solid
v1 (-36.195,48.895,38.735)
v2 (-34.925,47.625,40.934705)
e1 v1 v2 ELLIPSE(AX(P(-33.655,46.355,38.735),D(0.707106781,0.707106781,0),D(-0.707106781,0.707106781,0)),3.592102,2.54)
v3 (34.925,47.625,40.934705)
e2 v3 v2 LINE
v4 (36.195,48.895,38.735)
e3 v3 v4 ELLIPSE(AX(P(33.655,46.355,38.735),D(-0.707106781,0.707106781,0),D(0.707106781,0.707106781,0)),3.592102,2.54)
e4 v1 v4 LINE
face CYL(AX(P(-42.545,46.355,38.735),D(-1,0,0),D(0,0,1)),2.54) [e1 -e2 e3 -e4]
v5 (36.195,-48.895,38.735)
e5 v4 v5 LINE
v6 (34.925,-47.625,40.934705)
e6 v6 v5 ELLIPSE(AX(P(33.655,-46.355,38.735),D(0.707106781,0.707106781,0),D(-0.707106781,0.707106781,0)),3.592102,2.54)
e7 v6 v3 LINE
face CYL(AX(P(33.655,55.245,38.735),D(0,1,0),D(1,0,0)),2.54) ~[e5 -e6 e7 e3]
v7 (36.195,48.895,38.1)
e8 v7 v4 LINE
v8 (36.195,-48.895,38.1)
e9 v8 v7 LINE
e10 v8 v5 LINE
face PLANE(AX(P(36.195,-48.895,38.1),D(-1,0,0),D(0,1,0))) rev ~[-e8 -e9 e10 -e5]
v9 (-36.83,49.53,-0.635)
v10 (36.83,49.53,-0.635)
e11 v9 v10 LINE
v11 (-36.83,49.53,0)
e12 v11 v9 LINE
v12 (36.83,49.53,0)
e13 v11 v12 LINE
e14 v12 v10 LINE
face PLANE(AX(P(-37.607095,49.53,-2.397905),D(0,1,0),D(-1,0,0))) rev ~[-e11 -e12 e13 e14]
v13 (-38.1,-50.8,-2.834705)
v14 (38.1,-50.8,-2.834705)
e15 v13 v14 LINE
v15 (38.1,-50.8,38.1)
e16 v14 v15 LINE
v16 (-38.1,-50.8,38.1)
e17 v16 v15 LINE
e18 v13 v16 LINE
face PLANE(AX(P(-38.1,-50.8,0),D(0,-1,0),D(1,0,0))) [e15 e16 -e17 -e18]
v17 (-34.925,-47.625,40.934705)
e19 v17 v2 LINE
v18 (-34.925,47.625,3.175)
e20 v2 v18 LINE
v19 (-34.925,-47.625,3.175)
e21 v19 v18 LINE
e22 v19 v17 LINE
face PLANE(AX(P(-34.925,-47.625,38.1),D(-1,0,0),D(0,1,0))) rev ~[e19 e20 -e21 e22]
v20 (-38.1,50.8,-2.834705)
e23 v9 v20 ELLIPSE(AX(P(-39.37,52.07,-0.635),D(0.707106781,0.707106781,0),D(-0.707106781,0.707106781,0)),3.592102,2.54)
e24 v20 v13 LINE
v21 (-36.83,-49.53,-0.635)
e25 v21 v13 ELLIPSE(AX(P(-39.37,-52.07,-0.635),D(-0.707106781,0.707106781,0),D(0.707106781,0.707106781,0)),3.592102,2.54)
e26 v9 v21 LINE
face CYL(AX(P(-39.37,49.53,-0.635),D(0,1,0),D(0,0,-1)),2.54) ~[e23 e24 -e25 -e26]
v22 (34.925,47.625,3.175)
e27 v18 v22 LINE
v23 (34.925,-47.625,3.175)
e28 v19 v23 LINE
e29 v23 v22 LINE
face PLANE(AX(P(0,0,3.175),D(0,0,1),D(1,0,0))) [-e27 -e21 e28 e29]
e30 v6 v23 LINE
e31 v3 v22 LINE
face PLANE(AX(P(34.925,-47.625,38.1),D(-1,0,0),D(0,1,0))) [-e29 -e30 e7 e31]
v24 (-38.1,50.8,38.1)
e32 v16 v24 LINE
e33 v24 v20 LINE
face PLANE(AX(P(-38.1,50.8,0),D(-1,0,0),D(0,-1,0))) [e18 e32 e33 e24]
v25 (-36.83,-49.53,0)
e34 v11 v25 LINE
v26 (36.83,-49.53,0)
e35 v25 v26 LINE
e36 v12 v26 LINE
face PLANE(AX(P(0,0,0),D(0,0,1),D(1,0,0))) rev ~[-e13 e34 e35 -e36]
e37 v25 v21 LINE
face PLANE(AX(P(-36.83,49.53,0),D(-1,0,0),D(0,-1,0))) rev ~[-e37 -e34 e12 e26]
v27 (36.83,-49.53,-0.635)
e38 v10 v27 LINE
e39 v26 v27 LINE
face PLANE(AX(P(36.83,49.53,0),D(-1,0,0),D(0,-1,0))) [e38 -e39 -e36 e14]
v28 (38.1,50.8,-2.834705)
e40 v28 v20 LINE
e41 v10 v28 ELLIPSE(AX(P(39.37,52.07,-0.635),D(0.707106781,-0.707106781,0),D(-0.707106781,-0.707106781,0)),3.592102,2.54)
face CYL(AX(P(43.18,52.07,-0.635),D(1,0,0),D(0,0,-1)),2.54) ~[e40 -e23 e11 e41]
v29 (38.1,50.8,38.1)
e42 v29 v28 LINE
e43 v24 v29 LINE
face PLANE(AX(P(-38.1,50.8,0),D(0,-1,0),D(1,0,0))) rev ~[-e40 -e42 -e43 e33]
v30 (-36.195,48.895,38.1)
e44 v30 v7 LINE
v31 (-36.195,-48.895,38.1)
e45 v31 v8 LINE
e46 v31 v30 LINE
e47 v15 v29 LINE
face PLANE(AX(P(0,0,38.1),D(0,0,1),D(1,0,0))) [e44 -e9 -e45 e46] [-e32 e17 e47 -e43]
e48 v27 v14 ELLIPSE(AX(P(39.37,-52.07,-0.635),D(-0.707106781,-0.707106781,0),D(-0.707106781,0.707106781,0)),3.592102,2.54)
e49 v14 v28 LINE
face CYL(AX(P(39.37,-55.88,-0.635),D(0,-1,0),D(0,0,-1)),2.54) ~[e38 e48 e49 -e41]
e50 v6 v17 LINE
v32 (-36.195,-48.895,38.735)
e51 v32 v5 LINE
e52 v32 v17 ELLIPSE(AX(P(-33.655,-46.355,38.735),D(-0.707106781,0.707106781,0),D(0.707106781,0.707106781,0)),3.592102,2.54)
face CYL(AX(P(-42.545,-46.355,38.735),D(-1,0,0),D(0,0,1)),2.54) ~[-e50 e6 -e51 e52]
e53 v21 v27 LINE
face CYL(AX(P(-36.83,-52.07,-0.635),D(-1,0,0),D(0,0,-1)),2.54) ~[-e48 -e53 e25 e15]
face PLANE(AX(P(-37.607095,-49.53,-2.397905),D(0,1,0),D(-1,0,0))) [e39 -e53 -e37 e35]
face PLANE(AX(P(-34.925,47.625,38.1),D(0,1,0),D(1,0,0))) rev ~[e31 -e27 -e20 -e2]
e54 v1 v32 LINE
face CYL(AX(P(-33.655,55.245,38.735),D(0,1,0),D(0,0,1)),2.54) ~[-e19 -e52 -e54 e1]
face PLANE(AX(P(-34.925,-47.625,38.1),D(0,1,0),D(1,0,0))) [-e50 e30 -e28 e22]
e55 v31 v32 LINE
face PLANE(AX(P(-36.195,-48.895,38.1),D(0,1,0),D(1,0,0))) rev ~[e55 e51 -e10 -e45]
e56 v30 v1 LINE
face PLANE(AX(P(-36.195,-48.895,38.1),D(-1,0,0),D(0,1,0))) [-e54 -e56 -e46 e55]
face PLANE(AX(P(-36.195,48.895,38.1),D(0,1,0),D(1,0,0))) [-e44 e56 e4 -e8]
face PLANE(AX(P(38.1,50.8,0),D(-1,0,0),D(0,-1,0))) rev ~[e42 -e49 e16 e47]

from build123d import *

# Parameters (mm, degrees)
F0_W         = 76.2
F0_H         = 101.6
F1_DEPTH     = 38.1
F2_W         = 69.85
F2_H         = 95.25
F3_DEPTH     = 34.925
F4_W         = 72.39
F4_H         = 97.79
F4_W_2       = 69.85
F4_H_2       = 95.25
F5_DEPTH     = 3.175
F6_W         = 76.2
F6_H         = 101.6
F6_W_2       = 73.66
F6_H_2       = 99.06
F7_DEPTH     = 3.175
F8_T1_DEPTH  = 110.49
F8_T3_DEPTH  = 85.09
F8_T5_DEPTH  = 99.06
F8_T7_DEPTH  = 73.66
F8_T13_DEPTH = 105.41
F8_T19_DEPTH = 80.01
F8_T28_DEPTH = 105.41
F8_T34_DEPTH = 80.01
F8_T43_DEPTH = 80.01
F8_T49_DEPTH = 105.41
F8_T58_DEPTH = 105.41
F8_T64_DEPTH = 80.01


# Not quite as in the source:
# - a fillet or chamfer that OpenCascade refuses, or shapes differently, is made with other operations: its cross-section is extruded or revolved along the edge and cut away or added


with BuildPart() as f1:
    # F0 (on Top) → F1 (new body)
    with BuildSketch(Plane.XY):
        Rectangle(F0_W, F0_H)
    extrude(amount=F1_DEPTH)

    # F2 (on face) → F3 (cut)
    with BuildSketch(Plane.XY.offset(38.1)):
        Rectangle(F2_W, F2_H)
    extrude(amount=-F3_DEPTH, mode=Mode.SUBTRACT)

    # F4 (on face) → F5 (join)
    with BuildSketch(Plane.XY.offset(38.1)):
        Rectangle(F4_W, F4_H)
        Rectangle(F4_W_2, F4_H_2, mode=Mode.SUBTRACT)
    extrude(amount=F5_DEPTH)

    # F6 (on face) → F7 (join)
    with BuildSketch(Plane(origin=(0, 0, 0), x_dir=(1, 0, 0), z_dir=(0, 0, -1))):
        Rectangle(F6_W, F6_H)
        Rectangle(F6_W_2, F6_H_2, mode=Mode.SUBTRACT)
    extrude(amount=F7_DEPTH)

    # F8: fillet of radius 2.54 on 8 edges, made by hand

    # F8_s2 → F8_t1 (cut)
    with BuildSketch(Plane.XZ.offset(-55.245)):
        with BuildLine():
            ThreePointArc((-33.655, 41.275), (-35.4510512242, 40.5310512242), (-36.195, 38.735))
            Line((-36.195, 38.735), (-36.195, 41.275))
            Line((-36.195, 41.275), (-33.655, 41.275))
        make_face()
        with BuildLine():
            ThreePointArc((36.195, 38.735), (35.4510512242, 40.5310512242), (33.655, 41.275))
            Line((33.655, 41.275), (36.195, 41.275))
            Line((36.195, 41.275), (36.195, 38.735))
        make_face()
    extrude(amount=F8_T1_DEPTH, mode=Mode.SUBTRACT)

    # F8_s4 → F8_t3 (cut)
    with BuildSketch(Plane.YZ.offset(-42.545)):
        with BuildLine():
            ThreePointArc((-46.355, 41.275), (-48.1510512242, 40.5310512242), (-48.895, 38.735))
            Line((-48.895, 38.735), (-48.895, 41.275))
            Line((-48.895, 41.275), (-46.355, 41.275))
        make_face()
        with BuildLine():
            ThreePointArc((46.355, 41.275), (48.1510512242, 40.5310512242), (48.895, 38.735))
            Line((48.895, 38.735), (48.895, 41.275))
            Line((48.895, 41.275), (46.355, 41.275))
        make_face()
    extrude(amount=F8_T3_DEPTH, mode=Mode.SUBTRACT)

    # F8_s6 → F8_t5 (cut)
    with BuildSketch(Plane.XZ.offset(-49.53)):
        with BuildLine():
            ThreePointArc((-39.37, -3.175), (-37.5739487758, -2.4310512242), (-36.83, -0.635))
            Line((-36.83, -0.635), (-36.83, -3.175))
            Line((-36.83, -3.175), (-39.37, -3.175))
        make_face()
        with BuildLine():
            ThreePointArc((39.37, -3.175), (37.5739487758, -2.4310512242), (36.83, -0.635))
            Line((36.83, -0.635), (36.83, -3.175))
            Line((36.83, -3.175), (39.37, -3.175))
        make_face()
    extrude(amount=F8_T5_DEPTH, mode=Mode.SUBTRACT)

    # F8_s8 → F8_t7 (cut)
    with BuildSketch(Plane.YZ.offset(-36.83)):
        with BuildLine():
            ThreePointArc((-52.07, -3.175), (-50.2739487758, -2.4310512242), (-49.53, -0.635))
            Line((-49.53, -0.635), (-49.53, -3.175))
            Line((-49.53, -3.175), (-52.07, -3.175))
        make_face()
        with BuildLine():
            ThreePointArc((52.07, -3.175), (50.2739487758, -2.4310512242), (49.53, -0.635))
            Line((49.53, -0.635), (49.53, -3.175))
            Line((49.53, -3.175), (52.07, -3.175))
        make_face()
    extrude(amount=F8_T7_DEPTH, mode=Mode.SUBTRACT)


with BuildPart() as f8_tool11:
    # F8_s12 → F8_t13 (new body)
    with BuildSketch(Plane.XZ.offset(-55.88)):
        with BuildLine():
            ThreePointArc((-39.37, -3.175), (-37.5739487758, -2.4310512242), (-36.83, -0.635))
            Line((-36.83, -0.635), (-36.83, -3.175))
            Line((-36.83, -3.175), (-39.37, -3.175))
        make_face()
    extrude(amount=F8_T13_DEPTH)

    split(bisect_by=Plane.XZ.offset(-49.53), keep=Keep.BOTTOM)

    split(bisect_by=Plane.YZ.offset(-38.1), keep=Keep.TOP)

    split(bisect_by=Plane.XZ.offset(-50.8), keep=Keep.TOP)


with BuildPart() as f8_tool17:
    # F8_s18 → F8_t19 (new body)
    with BuildSketch(Plane.YZ.offset(36.83)):
        with BuildLine():
            ThreePointArc((52.07, -3.175), (50.2739487758, -2.4310512242), (49.53, -0.635))
            Line((49.53, -0.635), (49.53, -3.175))
            Line((49.53, -3.175), (52.07, -3.175))
        make_face()
    extrude(amount=-F8_T19_DEPTH)

    split(bisect_by=Plane.YZ.offset(-36.83), keep=Keep.BOTTOM)

    split(bisect_by=Plane.YZ.offset(-38.1), keep=Keep.TOP)

    split(bisect_by=Plane.XZ.offset(-50.8), keep=Keep.TOP)


with BuildPart() as f8_tool11_1:
    add(f8_tool11.part)

    # F8_t23: intersect F8_tool17
    add(f8_tool17.part, mode=Mode.INTERSECT)


with BuildPart() as f1_1:
    add(f1.part)

    # F8_t9: cut F8_tool11
    add(f8_tool11_1.part, mode=Mode.SUBTRACT)


with BuildPart() as f8_tool26:
    # F8_s27 → F8_t28 (new body)
    with BuildSketch(Plane.XZ.offset(-49.53)):
        with BuildLine():
            ThreePointArc((-39.37, -3.175), (-37.5739487758, -2.4310512242), (-36.83, -0.635))
            Line((-36.83, -0.635), (-36.83, -3.175))
            Line((-36.83, -3.175), (-39.37, -3.175))
        make_face()
    extrude(amount=F8_T28_DEPTH)

    split(bisect_by=Plane.XZ.offset(49.53), keep=Keep.TOP)

    split(bisect_by=Plane.YZ.offset(-38.1), keep=Keep.TOP)

    split(bisect_by=Plane.XZ.offset(50.8), keep=Keep.BOTTOM)


with BuildPart() as f8_tool32:
    # F8_s33 → F8_t34 (new body)
    with BuildSketch(Plane.YZ.offset(-43.18)):
        with BuildLine():
            ThreePointArc((-52.07, -3.175), (-50.2739487758, -2.4310512242), (-49.53, -0.635))
            Line((-49.53, -0.635), (-49.53, -3.175))
            Line((-49.53, -3.175), (-52.07, -3.175))
        make_face()
    extrude(amount=F8_T34_DEPTH)

    split(bisect_by=Plane.YZ.offset(-36.83), keep=Keep.BOTTOM)

    split(bisect_by=Plane.YZ.offset(-38.1), keep=Keep.TOP)

    split(bisect_by=Plane.XZ.offset(50.8), keep=Keep.BOTTOM)


with BuildPart() as f8_tool26_1:
    add(f8_tool26.part)

    # F8_t38: intersect F8_tool32
    add(f8_tool32.part, mode=Mode.INTERSECT)


with BuildPart() as f1_2:
    add(f1_1.part)

    # F8_t24: cut F8_tool26
    add(f8_tool26_1.part, mode=Mode.SUBTRACT)


with BuildPart() as f8_tool41:
    # F8_s42 → F8_t43 (new body)
    with BuildSketch(Plane.YZ.offset(-36.83)):
        with BuildLine():
            ThreePointArc((-52.07, -3.175), (-50.2739487758, -2.4310512242), (-49.53, -0.635))
            Line((-49.53, -0.635), (-49.53, -3.175))
            Line((-49.53, -3.175), (-52.07, -3.175))
        make_face()
    extrude(amount=F8_T43_DEPTH)

    split(bisect_by=Plane.YZ.offset(38.1), keep=Keep.BOTTOM)

    split(bisect_by=Plane.YZ.offset(36.83), keep=Keep.TOP)

    split(bisect_by=Plane.XZ.offset(50.8), keep=Keep.BOTTOM)


with BuildPart() as f8_tool47:
    # F8_s48 → F8_t49 (new body)
    with BuildSketch(Plane.XZ.offset(55.88)):
        with BuildLine():
            ThreePointArc((39.37, -3.175), (37.5739487758, -2.4310512242), (36.83, -0.635))
            Line((36.83, -0.635), (36.83, -3.175))
            Line((36.83, -3.175), (39.37, -3.175))
        make_face()
    extrude(amount=-F8_T49_DEPTH)

    split(bisect_by=Plane.YZ.offset(38.1), keep=Keep.BOTTOM)

    split(bisect_by=Plane.XZ.offset(49.53), keep=Keep.TOP)

    split(bisect_by=Plane.XZ.offset(50.8), keep=Keep.BOTTOM)


with BuildPart() as f8_tool41_1:
    add(f8_tool41.part)

    # F8_t53: intersect F8_tool47
    add(f8_tool47.part, mode=Mode.INTERSECT)


with BuildPart() as f1_3:
    add(f1_2.part)

    # F8_t39: cut F8_tool41
    add(f8_tool41_1.part, mode=Mode.SUBTRACT)


with BuildPart() as f8_tool56:
    # F8_s57 → F8_t58 (new body)
    with BuildSketch(Plane.XZ.offset(49.53)):
        with BuildLine():
            ThreePointArc((39.37, -3.175), (37.5739487758, -2.4310512242), (36.83, -0.635))
            Line((36.83, -0.635), (36.83, -3.175))
            Line((36.83, -3.175), (39.37, -3.175))
        make_face()
    extrude(amount=-F8_T58_DEPTH)

    split(bisect_by=Plane.YZ.offset(38.1), keep=Keep.BOTTOM)

    split(bisect_by=Plane.XZ.offset(-49.53), keep=Keep.BOTTOM)

    split(bisect_by=Plane.XZ.offset(-50.8), keep=Keep.TOP)


with BuildPart() as f8_tool62:
    # F8_s63 → F8_t64 (new body)
    with BuildSketch(Plane.YZ.offset(43.18)):
        with BuildLine():
            ThreePointArc((52.07, -3.175), (50.2739487758, -2.4310512242), (49.53, -0.635))
            Line((49.53, -0.635), (49.53, -3.175))
            Line((49.53, -3.175), (52.07, -3.175))
        make_face()
    extrude(amount=-F8_T64_DEPTH)

    split(bisect_by=Plane.YZ.offset(38.1), keep=Keep.BOTTOM)

    split(bisect_by=Plane.YZ.offset(36.83), keep=Keep.TOP)

    split(bisect_by=Plane.XZ.offset(-50.8), keep=Keep.TOP)


with BuildPart() as f8_tool56_1:
    add(f8_tool56.part)

    # F8_t68: intersect F8_tool62
    add(f8_tool62.part, mode=Mode.INTERSECT)


with BuildPart() as f1_4:
    add(f1_3.part)

    # F8_t54: cut F8_tool56
    add(f8_tool56_1.part, mode=Mode.SUBTRACT)


solid = f1_4.part
